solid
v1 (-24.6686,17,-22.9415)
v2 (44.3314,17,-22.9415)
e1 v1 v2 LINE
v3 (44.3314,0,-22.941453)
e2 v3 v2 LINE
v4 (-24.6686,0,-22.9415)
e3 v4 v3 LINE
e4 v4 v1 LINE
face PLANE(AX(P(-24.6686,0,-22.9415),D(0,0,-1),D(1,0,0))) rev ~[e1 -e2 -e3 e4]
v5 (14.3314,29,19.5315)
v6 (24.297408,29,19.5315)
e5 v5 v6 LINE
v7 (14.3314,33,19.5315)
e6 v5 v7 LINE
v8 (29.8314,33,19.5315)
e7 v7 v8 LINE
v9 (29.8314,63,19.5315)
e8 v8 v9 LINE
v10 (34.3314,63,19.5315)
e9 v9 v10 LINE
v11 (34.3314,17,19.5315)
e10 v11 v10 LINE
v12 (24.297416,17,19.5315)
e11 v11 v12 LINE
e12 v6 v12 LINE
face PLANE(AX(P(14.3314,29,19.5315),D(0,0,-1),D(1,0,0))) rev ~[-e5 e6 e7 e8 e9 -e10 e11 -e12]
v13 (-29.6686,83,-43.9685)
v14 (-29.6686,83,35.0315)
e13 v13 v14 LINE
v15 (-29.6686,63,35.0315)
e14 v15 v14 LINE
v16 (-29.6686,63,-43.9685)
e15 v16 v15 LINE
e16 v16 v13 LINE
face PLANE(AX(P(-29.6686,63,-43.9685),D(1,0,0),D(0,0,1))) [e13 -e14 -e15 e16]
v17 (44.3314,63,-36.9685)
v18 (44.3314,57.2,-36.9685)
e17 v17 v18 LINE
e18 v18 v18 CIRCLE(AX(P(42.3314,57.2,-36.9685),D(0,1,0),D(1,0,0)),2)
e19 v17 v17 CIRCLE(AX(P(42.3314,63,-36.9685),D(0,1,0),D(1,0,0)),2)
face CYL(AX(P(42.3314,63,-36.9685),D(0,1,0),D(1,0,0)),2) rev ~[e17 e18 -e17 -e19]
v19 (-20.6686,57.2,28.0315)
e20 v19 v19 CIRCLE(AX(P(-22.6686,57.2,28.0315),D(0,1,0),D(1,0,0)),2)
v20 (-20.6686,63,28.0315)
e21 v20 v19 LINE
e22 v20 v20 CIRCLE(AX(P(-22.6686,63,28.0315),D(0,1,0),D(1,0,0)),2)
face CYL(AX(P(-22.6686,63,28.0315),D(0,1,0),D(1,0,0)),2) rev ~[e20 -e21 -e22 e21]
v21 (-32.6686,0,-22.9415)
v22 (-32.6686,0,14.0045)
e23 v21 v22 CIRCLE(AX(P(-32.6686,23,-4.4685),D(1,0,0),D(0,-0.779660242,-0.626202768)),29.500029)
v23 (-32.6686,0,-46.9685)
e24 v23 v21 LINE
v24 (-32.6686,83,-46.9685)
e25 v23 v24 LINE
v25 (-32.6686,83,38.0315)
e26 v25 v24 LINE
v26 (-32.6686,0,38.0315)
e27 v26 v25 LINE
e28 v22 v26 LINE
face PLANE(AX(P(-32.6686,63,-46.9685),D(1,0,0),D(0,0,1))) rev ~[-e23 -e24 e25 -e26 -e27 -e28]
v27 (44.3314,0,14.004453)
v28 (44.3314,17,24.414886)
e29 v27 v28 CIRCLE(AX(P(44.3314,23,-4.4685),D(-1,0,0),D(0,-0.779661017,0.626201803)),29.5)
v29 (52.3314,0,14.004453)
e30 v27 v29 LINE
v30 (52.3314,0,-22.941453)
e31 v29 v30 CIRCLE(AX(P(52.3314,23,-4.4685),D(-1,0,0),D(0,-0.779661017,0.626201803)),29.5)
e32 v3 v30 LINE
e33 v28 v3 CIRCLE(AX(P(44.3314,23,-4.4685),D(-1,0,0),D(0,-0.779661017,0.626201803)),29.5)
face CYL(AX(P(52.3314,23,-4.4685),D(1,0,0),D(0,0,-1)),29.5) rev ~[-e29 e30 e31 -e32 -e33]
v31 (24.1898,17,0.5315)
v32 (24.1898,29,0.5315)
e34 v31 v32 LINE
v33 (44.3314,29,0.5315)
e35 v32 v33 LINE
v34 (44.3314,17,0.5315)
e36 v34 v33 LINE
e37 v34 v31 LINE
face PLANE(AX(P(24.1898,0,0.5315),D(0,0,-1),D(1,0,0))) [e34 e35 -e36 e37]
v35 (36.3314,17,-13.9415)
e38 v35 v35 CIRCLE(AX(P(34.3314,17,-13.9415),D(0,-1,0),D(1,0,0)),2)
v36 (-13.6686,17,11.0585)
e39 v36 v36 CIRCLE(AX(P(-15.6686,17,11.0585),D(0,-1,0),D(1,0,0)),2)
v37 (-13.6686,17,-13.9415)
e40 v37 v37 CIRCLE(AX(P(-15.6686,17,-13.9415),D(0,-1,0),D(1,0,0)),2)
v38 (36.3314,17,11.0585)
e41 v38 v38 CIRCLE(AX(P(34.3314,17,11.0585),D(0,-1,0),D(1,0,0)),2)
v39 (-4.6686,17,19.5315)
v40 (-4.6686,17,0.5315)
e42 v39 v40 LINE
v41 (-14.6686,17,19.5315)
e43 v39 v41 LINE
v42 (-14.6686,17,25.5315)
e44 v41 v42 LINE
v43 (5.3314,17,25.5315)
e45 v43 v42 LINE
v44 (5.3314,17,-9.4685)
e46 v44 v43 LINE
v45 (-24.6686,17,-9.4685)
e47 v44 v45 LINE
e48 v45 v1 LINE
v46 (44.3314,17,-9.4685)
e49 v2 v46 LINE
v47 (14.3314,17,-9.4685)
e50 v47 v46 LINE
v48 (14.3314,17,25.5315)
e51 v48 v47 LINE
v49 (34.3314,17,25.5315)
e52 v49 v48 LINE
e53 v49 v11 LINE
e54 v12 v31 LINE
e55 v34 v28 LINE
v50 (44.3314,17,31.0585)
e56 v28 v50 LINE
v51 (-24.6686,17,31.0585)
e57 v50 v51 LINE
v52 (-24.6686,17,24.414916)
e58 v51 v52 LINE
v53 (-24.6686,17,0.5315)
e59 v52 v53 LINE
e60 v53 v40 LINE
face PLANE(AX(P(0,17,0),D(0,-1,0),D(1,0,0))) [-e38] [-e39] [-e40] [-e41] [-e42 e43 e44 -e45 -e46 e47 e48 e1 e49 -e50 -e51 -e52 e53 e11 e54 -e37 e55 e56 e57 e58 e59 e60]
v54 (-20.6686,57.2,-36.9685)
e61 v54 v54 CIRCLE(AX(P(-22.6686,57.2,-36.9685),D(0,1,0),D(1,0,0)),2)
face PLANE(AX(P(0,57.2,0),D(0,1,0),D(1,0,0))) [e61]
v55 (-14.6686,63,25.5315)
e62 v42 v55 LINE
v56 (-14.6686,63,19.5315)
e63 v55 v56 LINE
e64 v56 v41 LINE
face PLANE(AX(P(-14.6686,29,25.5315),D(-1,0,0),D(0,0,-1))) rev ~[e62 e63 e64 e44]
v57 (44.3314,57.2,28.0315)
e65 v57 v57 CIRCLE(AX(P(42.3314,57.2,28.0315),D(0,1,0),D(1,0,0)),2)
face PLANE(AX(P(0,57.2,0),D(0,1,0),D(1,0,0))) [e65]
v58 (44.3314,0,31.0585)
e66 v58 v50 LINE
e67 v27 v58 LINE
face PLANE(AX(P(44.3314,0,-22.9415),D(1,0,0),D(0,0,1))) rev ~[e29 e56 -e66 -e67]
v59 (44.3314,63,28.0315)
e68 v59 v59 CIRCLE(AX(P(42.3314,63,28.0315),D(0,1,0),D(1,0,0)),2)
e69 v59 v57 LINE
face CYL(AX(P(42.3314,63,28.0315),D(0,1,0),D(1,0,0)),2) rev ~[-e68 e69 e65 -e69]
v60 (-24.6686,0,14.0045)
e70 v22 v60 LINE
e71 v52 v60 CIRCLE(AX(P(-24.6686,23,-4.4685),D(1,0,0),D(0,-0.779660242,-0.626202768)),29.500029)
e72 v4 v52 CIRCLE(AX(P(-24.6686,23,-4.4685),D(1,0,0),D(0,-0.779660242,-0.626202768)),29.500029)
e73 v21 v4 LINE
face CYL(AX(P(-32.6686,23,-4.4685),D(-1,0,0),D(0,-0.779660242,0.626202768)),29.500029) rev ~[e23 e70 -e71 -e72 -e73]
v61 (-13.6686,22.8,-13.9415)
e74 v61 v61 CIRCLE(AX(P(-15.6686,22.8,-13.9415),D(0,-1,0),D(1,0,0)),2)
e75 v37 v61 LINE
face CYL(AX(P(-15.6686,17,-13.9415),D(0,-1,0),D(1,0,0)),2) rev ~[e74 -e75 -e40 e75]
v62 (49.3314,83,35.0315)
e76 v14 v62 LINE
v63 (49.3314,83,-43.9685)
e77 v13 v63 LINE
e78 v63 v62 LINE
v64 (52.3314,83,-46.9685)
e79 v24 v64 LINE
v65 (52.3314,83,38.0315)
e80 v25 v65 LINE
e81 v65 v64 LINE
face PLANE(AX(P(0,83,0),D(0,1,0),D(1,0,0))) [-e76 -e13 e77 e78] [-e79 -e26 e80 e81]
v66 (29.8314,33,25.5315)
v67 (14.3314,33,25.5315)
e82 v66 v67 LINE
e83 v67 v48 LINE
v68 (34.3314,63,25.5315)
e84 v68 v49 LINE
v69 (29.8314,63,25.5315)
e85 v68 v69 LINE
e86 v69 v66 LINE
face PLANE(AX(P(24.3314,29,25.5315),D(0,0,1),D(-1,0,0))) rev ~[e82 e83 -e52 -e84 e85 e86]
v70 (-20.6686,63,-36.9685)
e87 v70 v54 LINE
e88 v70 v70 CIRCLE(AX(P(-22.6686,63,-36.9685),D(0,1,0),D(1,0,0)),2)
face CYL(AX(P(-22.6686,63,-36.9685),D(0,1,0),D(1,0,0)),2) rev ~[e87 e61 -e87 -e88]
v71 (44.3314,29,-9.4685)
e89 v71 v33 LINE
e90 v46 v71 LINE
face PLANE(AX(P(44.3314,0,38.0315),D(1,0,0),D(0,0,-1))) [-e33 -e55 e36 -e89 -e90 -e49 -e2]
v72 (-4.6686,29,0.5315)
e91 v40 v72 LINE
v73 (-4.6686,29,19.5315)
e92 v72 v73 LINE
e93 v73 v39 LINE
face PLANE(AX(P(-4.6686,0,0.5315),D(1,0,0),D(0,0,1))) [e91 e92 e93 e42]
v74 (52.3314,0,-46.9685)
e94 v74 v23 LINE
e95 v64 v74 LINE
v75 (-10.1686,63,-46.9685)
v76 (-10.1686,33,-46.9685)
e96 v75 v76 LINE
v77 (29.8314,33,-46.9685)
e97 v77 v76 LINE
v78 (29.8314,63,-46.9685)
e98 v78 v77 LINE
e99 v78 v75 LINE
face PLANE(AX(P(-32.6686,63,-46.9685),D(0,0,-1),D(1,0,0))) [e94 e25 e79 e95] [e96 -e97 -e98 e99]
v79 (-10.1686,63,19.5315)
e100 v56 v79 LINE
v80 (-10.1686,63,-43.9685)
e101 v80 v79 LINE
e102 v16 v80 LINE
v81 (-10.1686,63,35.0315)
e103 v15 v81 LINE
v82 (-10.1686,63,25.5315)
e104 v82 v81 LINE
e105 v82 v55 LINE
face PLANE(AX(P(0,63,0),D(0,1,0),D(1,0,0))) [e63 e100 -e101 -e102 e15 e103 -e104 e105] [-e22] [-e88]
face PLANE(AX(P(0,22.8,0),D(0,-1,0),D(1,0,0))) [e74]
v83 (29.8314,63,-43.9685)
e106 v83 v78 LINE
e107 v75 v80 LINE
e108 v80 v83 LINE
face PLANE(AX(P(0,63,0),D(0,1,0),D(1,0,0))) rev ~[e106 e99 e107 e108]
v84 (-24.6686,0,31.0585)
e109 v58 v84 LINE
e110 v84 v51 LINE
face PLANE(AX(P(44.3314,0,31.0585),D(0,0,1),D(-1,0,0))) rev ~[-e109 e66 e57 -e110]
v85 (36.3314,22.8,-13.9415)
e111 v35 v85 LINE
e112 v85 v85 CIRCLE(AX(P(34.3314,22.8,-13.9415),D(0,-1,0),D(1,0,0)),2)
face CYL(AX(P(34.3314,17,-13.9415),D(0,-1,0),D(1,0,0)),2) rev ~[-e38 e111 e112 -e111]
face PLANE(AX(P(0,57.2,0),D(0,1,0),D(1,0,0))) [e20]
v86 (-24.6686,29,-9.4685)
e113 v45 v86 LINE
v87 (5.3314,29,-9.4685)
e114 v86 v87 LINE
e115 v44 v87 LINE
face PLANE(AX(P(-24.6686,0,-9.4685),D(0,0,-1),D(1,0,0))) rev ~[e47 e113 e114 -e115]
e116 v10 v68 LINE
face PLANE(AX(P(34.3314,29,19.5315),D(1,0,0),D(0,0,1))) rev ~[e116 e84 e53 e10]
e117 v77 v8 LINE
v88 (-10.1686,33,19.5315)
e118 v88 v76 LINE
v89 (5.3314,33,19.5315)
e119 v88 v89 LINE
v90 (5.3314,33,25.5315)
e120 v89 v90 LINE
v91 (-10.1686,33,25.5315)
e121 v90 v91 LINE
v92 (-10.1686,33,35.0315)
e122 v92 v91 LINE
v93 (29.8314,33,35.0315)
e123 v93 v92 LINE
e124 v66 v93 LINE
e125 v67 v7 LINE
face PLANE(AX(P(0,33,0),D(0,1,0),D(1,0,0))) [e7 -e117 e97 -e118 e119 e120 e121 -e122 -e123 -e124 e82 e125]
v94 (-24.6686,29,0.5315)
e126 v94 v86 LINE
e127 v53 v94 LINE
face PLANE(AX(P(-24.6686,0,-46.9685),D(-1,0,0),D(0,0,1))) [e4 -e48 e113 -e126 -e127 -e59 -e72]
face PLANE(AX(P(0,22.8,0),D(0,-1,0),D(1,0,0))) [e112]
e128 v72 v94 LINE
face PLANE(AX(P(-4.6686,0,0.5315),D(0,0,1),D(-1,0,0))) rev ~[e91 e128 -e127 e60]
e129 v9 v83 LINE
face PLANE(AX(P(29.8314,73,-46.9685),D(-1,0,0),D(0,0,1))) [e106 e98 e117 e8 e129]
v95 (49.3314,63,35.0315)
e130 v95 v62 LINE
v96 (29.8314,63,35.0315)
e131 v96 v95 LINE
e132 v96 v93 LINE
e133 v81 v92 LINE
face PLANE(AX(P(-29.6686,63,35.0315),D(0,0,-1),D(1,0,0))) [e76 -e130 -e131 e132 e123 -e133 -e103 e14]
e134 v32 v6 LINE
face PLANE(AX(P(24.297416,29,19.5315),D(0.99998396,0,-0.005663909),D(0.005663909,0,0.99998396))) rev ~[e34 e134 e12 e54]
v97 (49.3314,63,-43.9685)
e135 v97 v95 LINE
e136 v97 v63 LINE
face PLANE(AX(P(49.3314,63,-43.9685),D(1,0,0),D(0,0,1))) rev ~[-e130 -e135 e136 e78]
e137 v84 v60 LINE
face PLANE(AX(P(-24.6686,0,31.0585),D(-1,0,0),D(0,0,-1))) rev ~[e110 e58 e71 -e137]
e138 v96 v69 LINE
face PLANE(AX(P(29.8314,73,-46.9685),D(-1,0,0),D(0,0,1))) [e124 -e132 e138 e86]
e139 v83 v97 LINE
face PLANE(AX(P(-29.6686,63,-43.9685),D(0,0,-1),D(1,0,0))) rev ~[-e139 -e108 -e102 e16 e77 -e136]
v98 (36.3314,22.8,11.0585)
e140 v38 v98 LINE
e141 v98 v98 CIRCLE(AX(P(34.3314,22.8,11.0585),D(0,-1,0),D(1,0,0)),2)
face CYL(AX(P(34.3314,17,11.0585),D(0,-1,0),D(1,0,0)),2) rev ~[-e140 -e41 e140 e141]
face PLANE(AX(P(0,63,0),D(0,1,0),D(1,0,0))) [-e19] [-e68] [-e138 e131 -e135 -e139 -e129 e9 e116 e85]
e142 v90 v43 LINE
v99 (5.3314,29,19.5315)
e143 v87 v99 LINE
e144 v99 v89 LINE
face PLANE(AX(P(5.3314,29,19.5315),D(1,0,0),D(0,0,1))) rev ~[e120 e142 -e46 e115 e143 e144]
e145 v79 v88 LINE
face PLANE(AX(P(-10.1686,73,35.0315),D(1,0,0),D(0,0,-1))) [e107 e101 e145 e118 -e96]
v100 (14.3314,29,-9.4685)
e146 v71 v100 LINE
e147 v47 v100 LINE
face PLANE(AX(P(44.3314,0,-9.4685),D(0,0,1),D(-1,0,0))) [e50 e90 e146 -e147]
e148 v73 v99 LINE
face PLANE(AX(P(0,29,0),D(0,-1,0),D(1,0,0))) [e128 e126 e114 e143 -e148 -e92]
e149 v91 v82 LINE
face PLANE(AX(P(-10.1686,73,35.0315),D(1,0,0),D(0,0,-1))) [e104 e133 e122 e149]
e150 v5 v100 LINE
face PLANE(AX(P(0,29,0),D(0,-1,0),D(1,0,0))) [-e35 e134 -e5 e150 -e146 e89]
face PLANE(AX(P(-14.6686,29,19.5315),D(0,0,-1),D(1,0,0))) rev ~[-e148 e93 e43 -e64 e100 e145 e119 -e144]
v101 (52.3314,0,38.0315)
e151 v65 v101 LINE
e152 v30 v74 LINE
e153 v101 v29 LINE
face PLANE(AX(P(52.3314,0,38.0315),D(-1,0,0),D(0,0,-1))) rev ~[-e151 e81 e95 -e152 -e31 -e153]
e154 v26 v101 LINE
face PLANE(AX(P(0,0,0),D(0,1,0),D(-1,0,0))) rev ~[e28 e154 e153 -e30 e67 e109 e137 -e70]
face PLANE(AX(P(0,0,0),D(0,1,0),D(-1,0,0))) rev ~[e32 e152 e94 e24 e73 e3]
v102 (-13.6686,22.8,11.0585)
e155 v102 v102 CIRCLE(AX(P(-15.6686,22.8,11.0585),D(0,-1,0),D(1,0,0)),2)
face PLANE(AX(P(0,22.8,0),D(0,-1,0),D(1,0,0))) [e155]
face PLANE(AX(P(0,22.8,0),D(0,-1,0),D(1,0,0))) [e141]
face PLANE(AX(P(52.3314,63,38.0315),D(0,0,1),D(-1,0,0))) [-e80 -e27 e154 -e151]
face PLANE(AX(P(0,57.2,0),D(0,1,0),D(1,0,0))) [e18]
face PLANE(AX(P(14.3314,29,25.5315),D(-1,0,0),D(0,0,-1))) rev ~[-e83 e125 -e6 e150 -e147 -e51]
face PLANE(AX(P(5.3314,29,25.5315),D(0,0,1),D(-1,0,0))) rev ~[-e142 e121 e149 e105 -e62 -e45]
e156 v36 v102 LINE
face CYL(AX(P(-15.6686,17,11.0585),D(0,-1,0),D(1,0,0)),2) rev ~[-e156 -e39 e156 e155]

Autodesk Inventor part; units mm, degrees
ref_plane "YZ Plane" through (0, 0, 0) normal (1, 0, 0) x (0, 1, 0)
ref_plane "XZ Plane" through (0, 0, 0) normal (0, 1, 0) x (-1, 0, 0)
ref_plane "XY Plane" through (0, 0, 0) normal (0, 0, 1) x (1, 0, 0)
sketch "Sketch1" plane through (0, 0, 0) normal (0, 1, 0) x (-1, 0, 0)
  line L0 (32.6686, 38.0315) -> (-52.3314, 38.0315)
  line L1 (-52.3314, 38.0315) -> (-52.3314, -46.9685)
  line L2 (-52.3314, -46.9685) -> (32.6686, -46.9685)
  line L3 (32.6686, -46.9685) -> (32.6686, 38.0315)
  point P0 (0, 0)
  dimension "d0" = 85
  dimension "d1" = 85
extrude "Extrusion1" add sketch "Sketch1" along normal blind 73
sketch "Sketch2" plane through (52.3314, 0, 38.0315) normal (1, 0, 0) x (0, 0, -1)
  point P0 (38.0315, 0)
sketch "Sketch3" plane through (52.3314, 0, 38.0315) normal (1, 0, 0) x (0, 0, -1)
  circle A0 centre (42.5, 23) radius 29.5
  line L0 (0, 73) -> (85, 73) projected
  line L1 (85, 0) -> (85, 73) projected
  point P0 (38.0315, 0)
  dimension "d4" = 59
  dimension "d5" = 50
  dimension "d6" = 42.5
extrude "Extrusion2" cut sketch "Sketch3" against normal blind 8
sketch "Sketch4" plane through (-32.6686, 0, -46.9685) normal (-1, 0, 0) x (0, 0, 1)
  arc A0 (60.973, 0) -> (24.027, 0) centre (42.5, 23) ccw projected
  circle A1 centre (42.5, 23) radius 29.5
  point P0 (46.9685, 0)
  point P1 (24.027, 0)
extrude "Extrusion3" cut sketch "Sketch4" against normal blind 8
sketch "Sketch5" plane through (0, 0, 0) normal (0, -1, 0) x (1, 0, 0)
  line L0 (-24.6686, 14.0044) -> (-24.6686, -22.9415) projected
  line L1 (-24.6686, -9.4685) -> (5.3314, -9.4685)
  line L2 (5.3314, -9.4685) -> (5.3314, 0.5315)
  line L3 (-4.6686, 0.5315) -> (-24.6686, 0.5315)
  line L4 (-24.6686, 0.5315) -> (-24.6686, -9.4685)
  line L5 (-4.6686, 0.5315) -> (-4.6686, 25.5315)
  line L6 (-4.6686, 25.5315) -> (5.3314, 25.5315)
  line L7 (5.3314, 25.5315) -> (5.3314, 0.5315)
  line L8 (-24.6686, -9.4685) -> (-24.6686, 0.5315)
  line L9 (44.3314, -9.4685) -> (14.3314, -9.4685)
  line L10 (14.3314, -9.4685) -> (14.3314, 0.5315)
  line L11 (24.1898, 0.5315) -> (44.3314, 0.5315)
  line L12 (24.1898, 0.5315) -> (24.3314, 25.5315)
  line L13 (24.3314, 25.5315) -> (14.3314, 25.5315)
  line L14 (14.3314, 25.5315) -> (14.3314, 0.5315)
  line L15 (44.3314, -9.4685) -> (44.3314, 0.5315)
  line L16 (44.3314, -22.9415) -> (44.3314, 14.0044) projected
  point P0 (0, 0)
  dimension "d13" = 13.473
  dimension "d35" = 10
  dimension "d36" = 9
  dimension "d37" = 10
sketch "Sketch6" plane through (-24.6686, 0, -46.9685) normal (-1, 0, 0) x (0, 0, 1)
  arc A0 (60.973, 0) -> (24.027, 0) centre (42.5, 23) ccw projected
  line L0 (42.5, 23) -> (131.4973, 23)
  point P0 (46.9685, 0)
extrude "Extrusion4" cut sketch "Sketch5" against normal blind 29
sketch "Sketch7" plane through (0, 0, 0) normal (0, -1, 0) x (1, 0, 0)
  line L0 (-24.6686, -22.9415) -> (44.3314, -22.9415)
  line L1 (44.3314, -22.9415) -> (44.3314, 31.0585)
  line L2 (44.3314, 31.0585) -> (-24.6686, 31.0585)
  line L3 (-24.6686, 31.0585) -> (-24.6686, -22.9415)
  point P0 (0, 0)
  dimension "d19" = 69
  dimension "d20" = 54
extrude "Extrusion5" cut sketch "Sketch7" against normal blind 17
sketch "Sketch8" plane through (0, 17, 0) normal (0, -1, 0) x (1, 0, 0)
  circle A0 centre (-15.6686, -13.9415) radius 2
  circle A1 centre (-15.6686, 11.0585) radius 2
  circle A2 centre (34.3314, 11.0585) radius 2
  circle A3 centre (34.3314, -13.9415) radius 2
  line L0 (-26.1879, -23.917) -> (41.8121, -23.917)
  line L1 (-24.6686, 31.0585) -> (44.3314, 31.0585) projected
  line L2 (-24.6686, 31.0585) -> (44.3314, 31.0585)
  line L3 (44.3314, 31.0585) -> (44.3314, -22.9415)
  line L4 (44.3314, -22.9415) -> (-24.6686, -22.9415)
  line L5 (-24.6686, -22.9415) -> (-24.6686, 31.0585)
  point P0 (0, 0)
  point P1 (-18.7833, -12.5016)
  dimension "d23" = 4
  dimension "d24" = 4
  dimension "d25" = 4
  dimension "d26" = 4
  dimension "d27" = 50
  dimension "d28" = 25
  dimension "d31" = 9
  dimension "d32" = 9
extrude "Extrusion6" cut sketch "Sketch8" against normal blind 5.8 contours A0 | A1 | A2 | A3
sketch "Sketch9" plane through (0, 29, 0) normal (0, -1, 0) x (1, 0, 0)
  line L0 (24.1898, 0.5315) -> (24.3314, 25.5315) projected
  line L1 (14.3314, 25.5315) -> (14.3314, -9.4685) projected
  line L2 (24.3314, 25.5315) -> (14.3314, 25.5315)
  line L3 (14.3314, 25.5315) -> (14.3314, 19.5315)
  line L4 (14.3314, 19.5315) -> (24.3314, 19.5315)
  line L5 (24.3314, 19.5315) -> (24.3314, 25.5315)
  line L6 (5.3314, -9.4685) -> (5.3314, 25.5315) projected
  line L7 (5.3314, 25.5315) -> (-14.6686, 25.5315)
  line L8 (-14.6686, 25.5315) -> (-14.6686, 19.5315)
  line L9 (-14.6686, 19.5315) -> (5.3314, 19.5315)
  line L10 (5.3314, 19.5315) -> (5.3314, 25.5315)
  point P0 (0, 0)
  point P1 (24.2974, 19.5315)
  dimension "d39" = 20
  dimension "d40" = 6
  dimension "d47" = 10
extrude "Extrusion7" cut sketch "Sketch9" against normal blind 61.25 contours L4 L1 L2 L0 | L9 L8 L7 L6
sketch "Sketch10" plane through (0, 73, 0) normal (0, 1, 0) x (1, 0, 0)
  line L0 (52.3314, 46.9685) -> (-32.6686, 46.9685) projected
  line L1 (-10.1686, 46.9685) -> (29.8314, 46.9685)
  line L2 (29.8314, 46.9685) -> (29.8314, -35.0315)
  line L3 (29.8314, -35.0315) -> (-10.1686, -35.0315)
  line L4 (-10.1686, -35.0315) -> (-10.1686, 46.9685)
  line L5 (-32.6686, 46.9685) -> (-32.6686, -38.0315) projected
  point P0 (0, 0)
  dimension "d43" = 40
  dimension "d44" = 82
  dimension "d51" = 22.5
sketch "Sketch11" plane through (0, 29, 0) normal (0, -1, 0) x (1, 0, 0)
  line L0 (24.2974, 19.5315) -> (14.3314, 19.5315) projected
  line L1 (14.3314, 19.5315) -> (34.3314, 19.5315)
  line L2 (34.3314, 19.5315) -> (34.3314, 25.5315)
  line L3 (34.3314, 25.5315) -> (14.3314, 25.5315)
  line L4 (14.3314, 25.5315) -> (14.3314, 19.5315)
  point P0 (0, 0)
  dimension "d48" = 20
extrude "Extrusion8" cut sketch "Sketch11" against normal blind 61.25
extrude "Extrusion9" cut sketch "Sketch10" against normal blind 40
sketch "Sketch12" plane through (0, 73, 0) normal (0, 1, 0) x (1, 0, 0)
  line L0 (-56.5689, -78.065) -> (64.3856, -78.065)
  line L1 (64.3856, -78.065) -> (64.3856, 116.3261)
  line L2 (64.3856, 116.3261) -> (-56.5689, 116.3261)
  line L3 (-56.5689, 116.3261) -> (-56.5689, -78.065)
  point P0 (0, 0)
extrude "Extrusion10" cut sketch "Sketch12" against normal blind 10
sketch "Sketch14" plane through (0, 63, 0) normal (0, 1, 0) x (1, 0, 0)
  circle A0 centre (42.3314, -28.0315) radius 2
  circle A1 centre (-22.6686, -28.0315) radius 2
  circle A2 centre (-22.6686, 36.9685) radius 2
  circle A3 centre (42.3314, 36.9685) radius 2
  line L0 (52.3314, 46.9685) -> (52.3314, -38.0315) projected
  line L1 (52.3314, -38.0315) -> (-32.6686, -38.0315) projected
  line L2 (-32.6686, -38.0315) -> (-32.6686, 46.9685) projected
  point P0 (0, 0)
  dimension "d56" = 4
  dimension "d57" = 4
  dimension "d58" = 4
  dimension "d59" = 4
  dimension "d60" = 65
  dimension "d61" = 65
  dimension "d62" = 10
  dimension "d63" = 10
  dimension "d64" = 10
extrude "Extrusion11" cut sketch "Sketch14" against normal blind 5.8
sketch "Sketch15" plane through (0, 63, 0) normal (0, 1, 0) x (1, 0, 0)
  line L0 (-32.6686, 46.9685) -> (-32.6686, 22.9415) projected
  line L1 (-32.6686, 46.9685) -> (-29.6686, 46.9685)
  line L2 (52.3314, 46.9685) -> (-32.6686, 46.9685) projected
  line L3 (-29.6686, 43.9685) -> (-29.6686, -35.0315)
  line L4 (-32.6686, -38.0315) -> (-32.6686, 46.9685) projected
  line L5 (-32.6686, -38.0315) -> (-29.6686, -38.0315)
  line L6 (-29.6686, 46.9685) -> (-32.6686, 46.9685)
  line L7 (-32.6686, 46.9685) -> (-32.6686, -38.0315)
  line L8 (52.3314, 46.9685) -> (52.3314, -38.0315) projected
  line L9 (52.3314, -38.0315) -> (-29.6686, -38.0315)
  line L10 (-29.6686, -35.0315) -> (49.3314, -35.0315)
  line L11 (52.3314, -35.0315) -> (52.3314, -38.0315)
  line L12 (52.3314, 46.9685) -> (49.3314, 46.9685)
  line L13 (49.3314, 43.9685) -> (49.3314, -35.0315)
  line L14 (49.3314, -38.0315) -> (52.3314, -38.0315)
  line L15 (52.3314, -38.0315) -> (52.3314, 46.9685)
  line L16 (49.3314, 46.9685) -> (-29.6686, 46.9685)
  line L17 (-29.6686, 43.9685) -> (49.3314, 43.9685)
  point P0 (0, 0)
  dimension "d67" = 3
  dimension "d69" = 3
  dimension "d70" = 3
extrude "Extrusion12" add sketch "Sketch15" along normal blind 20
sketch "Sketch16" plane through (0, 29, 0) normal (0, 1, 0) x (1, 0, 0)
  line L0 (-14.6686, -25.5315) -> (-14.6686, -19.5315) projected
  line L1 (5.3314, 9.4685) -> (5.3314, -25.5315) projected
  line L2 (-14.6686, -19.5315) -> (5.3314, -19.5315)
  line L3 (5.3314, -19.5315) -> (5.3314, -25.5315)
  line L4 (5.3314, -25.5315) -> (-14.6686, -25.5315)
  line L5 (-14.6686, -25.5315) -> (-14.6686, -19.5315)
  line L6 (24.2974, -19.5315) -> (14.3314, -19.5315) projected
  line L7 (34.3314, -25.5315) -> (24.3314, -25.5315) projected
  line L8 (14.3314, -19.5315) -> (34.3314, -19.5315)
  line L9 (34.3314, -19.5315) -> (34.3314, -25.5315)
  line L10 (34.3314, -25.5315) -> (14.3314, -25.5315)
  line L11 (14.3314, -25.5315) -> (14.3314, -19.5315)
  point P0 (0, 0)
  point P1 (5.3314, -19.5315)
extrude "Extrusion13" cut sketch "Sketch16" against normal through all
sketch "Sketch17" plane through (0, 0, 0) normal (0, -1, 0) x (1, 0, 0)
  point P0 (0, 0)
sketch "Sketch18" plane through (0, 17, 0) normal (0, -1, 0) x (1, 0, 0)
  line L0 (5.3314, 19.5315) -> (5.3314, -9.4685) projected
  line L1 (5.3314, -9.4685) -> (16.5671, -9.4685)
  line L2 (16.5671, -9.4685) -> (16.5671, 0.5747)
  line L3 (16.5671, 0.5747) -> (5.3314, 0.5747)
  line L4 (5.3314, 0.5747) -> (5.3314, -9.4685)
  point P0 (0, 0)
properties part number "RobotBase"
